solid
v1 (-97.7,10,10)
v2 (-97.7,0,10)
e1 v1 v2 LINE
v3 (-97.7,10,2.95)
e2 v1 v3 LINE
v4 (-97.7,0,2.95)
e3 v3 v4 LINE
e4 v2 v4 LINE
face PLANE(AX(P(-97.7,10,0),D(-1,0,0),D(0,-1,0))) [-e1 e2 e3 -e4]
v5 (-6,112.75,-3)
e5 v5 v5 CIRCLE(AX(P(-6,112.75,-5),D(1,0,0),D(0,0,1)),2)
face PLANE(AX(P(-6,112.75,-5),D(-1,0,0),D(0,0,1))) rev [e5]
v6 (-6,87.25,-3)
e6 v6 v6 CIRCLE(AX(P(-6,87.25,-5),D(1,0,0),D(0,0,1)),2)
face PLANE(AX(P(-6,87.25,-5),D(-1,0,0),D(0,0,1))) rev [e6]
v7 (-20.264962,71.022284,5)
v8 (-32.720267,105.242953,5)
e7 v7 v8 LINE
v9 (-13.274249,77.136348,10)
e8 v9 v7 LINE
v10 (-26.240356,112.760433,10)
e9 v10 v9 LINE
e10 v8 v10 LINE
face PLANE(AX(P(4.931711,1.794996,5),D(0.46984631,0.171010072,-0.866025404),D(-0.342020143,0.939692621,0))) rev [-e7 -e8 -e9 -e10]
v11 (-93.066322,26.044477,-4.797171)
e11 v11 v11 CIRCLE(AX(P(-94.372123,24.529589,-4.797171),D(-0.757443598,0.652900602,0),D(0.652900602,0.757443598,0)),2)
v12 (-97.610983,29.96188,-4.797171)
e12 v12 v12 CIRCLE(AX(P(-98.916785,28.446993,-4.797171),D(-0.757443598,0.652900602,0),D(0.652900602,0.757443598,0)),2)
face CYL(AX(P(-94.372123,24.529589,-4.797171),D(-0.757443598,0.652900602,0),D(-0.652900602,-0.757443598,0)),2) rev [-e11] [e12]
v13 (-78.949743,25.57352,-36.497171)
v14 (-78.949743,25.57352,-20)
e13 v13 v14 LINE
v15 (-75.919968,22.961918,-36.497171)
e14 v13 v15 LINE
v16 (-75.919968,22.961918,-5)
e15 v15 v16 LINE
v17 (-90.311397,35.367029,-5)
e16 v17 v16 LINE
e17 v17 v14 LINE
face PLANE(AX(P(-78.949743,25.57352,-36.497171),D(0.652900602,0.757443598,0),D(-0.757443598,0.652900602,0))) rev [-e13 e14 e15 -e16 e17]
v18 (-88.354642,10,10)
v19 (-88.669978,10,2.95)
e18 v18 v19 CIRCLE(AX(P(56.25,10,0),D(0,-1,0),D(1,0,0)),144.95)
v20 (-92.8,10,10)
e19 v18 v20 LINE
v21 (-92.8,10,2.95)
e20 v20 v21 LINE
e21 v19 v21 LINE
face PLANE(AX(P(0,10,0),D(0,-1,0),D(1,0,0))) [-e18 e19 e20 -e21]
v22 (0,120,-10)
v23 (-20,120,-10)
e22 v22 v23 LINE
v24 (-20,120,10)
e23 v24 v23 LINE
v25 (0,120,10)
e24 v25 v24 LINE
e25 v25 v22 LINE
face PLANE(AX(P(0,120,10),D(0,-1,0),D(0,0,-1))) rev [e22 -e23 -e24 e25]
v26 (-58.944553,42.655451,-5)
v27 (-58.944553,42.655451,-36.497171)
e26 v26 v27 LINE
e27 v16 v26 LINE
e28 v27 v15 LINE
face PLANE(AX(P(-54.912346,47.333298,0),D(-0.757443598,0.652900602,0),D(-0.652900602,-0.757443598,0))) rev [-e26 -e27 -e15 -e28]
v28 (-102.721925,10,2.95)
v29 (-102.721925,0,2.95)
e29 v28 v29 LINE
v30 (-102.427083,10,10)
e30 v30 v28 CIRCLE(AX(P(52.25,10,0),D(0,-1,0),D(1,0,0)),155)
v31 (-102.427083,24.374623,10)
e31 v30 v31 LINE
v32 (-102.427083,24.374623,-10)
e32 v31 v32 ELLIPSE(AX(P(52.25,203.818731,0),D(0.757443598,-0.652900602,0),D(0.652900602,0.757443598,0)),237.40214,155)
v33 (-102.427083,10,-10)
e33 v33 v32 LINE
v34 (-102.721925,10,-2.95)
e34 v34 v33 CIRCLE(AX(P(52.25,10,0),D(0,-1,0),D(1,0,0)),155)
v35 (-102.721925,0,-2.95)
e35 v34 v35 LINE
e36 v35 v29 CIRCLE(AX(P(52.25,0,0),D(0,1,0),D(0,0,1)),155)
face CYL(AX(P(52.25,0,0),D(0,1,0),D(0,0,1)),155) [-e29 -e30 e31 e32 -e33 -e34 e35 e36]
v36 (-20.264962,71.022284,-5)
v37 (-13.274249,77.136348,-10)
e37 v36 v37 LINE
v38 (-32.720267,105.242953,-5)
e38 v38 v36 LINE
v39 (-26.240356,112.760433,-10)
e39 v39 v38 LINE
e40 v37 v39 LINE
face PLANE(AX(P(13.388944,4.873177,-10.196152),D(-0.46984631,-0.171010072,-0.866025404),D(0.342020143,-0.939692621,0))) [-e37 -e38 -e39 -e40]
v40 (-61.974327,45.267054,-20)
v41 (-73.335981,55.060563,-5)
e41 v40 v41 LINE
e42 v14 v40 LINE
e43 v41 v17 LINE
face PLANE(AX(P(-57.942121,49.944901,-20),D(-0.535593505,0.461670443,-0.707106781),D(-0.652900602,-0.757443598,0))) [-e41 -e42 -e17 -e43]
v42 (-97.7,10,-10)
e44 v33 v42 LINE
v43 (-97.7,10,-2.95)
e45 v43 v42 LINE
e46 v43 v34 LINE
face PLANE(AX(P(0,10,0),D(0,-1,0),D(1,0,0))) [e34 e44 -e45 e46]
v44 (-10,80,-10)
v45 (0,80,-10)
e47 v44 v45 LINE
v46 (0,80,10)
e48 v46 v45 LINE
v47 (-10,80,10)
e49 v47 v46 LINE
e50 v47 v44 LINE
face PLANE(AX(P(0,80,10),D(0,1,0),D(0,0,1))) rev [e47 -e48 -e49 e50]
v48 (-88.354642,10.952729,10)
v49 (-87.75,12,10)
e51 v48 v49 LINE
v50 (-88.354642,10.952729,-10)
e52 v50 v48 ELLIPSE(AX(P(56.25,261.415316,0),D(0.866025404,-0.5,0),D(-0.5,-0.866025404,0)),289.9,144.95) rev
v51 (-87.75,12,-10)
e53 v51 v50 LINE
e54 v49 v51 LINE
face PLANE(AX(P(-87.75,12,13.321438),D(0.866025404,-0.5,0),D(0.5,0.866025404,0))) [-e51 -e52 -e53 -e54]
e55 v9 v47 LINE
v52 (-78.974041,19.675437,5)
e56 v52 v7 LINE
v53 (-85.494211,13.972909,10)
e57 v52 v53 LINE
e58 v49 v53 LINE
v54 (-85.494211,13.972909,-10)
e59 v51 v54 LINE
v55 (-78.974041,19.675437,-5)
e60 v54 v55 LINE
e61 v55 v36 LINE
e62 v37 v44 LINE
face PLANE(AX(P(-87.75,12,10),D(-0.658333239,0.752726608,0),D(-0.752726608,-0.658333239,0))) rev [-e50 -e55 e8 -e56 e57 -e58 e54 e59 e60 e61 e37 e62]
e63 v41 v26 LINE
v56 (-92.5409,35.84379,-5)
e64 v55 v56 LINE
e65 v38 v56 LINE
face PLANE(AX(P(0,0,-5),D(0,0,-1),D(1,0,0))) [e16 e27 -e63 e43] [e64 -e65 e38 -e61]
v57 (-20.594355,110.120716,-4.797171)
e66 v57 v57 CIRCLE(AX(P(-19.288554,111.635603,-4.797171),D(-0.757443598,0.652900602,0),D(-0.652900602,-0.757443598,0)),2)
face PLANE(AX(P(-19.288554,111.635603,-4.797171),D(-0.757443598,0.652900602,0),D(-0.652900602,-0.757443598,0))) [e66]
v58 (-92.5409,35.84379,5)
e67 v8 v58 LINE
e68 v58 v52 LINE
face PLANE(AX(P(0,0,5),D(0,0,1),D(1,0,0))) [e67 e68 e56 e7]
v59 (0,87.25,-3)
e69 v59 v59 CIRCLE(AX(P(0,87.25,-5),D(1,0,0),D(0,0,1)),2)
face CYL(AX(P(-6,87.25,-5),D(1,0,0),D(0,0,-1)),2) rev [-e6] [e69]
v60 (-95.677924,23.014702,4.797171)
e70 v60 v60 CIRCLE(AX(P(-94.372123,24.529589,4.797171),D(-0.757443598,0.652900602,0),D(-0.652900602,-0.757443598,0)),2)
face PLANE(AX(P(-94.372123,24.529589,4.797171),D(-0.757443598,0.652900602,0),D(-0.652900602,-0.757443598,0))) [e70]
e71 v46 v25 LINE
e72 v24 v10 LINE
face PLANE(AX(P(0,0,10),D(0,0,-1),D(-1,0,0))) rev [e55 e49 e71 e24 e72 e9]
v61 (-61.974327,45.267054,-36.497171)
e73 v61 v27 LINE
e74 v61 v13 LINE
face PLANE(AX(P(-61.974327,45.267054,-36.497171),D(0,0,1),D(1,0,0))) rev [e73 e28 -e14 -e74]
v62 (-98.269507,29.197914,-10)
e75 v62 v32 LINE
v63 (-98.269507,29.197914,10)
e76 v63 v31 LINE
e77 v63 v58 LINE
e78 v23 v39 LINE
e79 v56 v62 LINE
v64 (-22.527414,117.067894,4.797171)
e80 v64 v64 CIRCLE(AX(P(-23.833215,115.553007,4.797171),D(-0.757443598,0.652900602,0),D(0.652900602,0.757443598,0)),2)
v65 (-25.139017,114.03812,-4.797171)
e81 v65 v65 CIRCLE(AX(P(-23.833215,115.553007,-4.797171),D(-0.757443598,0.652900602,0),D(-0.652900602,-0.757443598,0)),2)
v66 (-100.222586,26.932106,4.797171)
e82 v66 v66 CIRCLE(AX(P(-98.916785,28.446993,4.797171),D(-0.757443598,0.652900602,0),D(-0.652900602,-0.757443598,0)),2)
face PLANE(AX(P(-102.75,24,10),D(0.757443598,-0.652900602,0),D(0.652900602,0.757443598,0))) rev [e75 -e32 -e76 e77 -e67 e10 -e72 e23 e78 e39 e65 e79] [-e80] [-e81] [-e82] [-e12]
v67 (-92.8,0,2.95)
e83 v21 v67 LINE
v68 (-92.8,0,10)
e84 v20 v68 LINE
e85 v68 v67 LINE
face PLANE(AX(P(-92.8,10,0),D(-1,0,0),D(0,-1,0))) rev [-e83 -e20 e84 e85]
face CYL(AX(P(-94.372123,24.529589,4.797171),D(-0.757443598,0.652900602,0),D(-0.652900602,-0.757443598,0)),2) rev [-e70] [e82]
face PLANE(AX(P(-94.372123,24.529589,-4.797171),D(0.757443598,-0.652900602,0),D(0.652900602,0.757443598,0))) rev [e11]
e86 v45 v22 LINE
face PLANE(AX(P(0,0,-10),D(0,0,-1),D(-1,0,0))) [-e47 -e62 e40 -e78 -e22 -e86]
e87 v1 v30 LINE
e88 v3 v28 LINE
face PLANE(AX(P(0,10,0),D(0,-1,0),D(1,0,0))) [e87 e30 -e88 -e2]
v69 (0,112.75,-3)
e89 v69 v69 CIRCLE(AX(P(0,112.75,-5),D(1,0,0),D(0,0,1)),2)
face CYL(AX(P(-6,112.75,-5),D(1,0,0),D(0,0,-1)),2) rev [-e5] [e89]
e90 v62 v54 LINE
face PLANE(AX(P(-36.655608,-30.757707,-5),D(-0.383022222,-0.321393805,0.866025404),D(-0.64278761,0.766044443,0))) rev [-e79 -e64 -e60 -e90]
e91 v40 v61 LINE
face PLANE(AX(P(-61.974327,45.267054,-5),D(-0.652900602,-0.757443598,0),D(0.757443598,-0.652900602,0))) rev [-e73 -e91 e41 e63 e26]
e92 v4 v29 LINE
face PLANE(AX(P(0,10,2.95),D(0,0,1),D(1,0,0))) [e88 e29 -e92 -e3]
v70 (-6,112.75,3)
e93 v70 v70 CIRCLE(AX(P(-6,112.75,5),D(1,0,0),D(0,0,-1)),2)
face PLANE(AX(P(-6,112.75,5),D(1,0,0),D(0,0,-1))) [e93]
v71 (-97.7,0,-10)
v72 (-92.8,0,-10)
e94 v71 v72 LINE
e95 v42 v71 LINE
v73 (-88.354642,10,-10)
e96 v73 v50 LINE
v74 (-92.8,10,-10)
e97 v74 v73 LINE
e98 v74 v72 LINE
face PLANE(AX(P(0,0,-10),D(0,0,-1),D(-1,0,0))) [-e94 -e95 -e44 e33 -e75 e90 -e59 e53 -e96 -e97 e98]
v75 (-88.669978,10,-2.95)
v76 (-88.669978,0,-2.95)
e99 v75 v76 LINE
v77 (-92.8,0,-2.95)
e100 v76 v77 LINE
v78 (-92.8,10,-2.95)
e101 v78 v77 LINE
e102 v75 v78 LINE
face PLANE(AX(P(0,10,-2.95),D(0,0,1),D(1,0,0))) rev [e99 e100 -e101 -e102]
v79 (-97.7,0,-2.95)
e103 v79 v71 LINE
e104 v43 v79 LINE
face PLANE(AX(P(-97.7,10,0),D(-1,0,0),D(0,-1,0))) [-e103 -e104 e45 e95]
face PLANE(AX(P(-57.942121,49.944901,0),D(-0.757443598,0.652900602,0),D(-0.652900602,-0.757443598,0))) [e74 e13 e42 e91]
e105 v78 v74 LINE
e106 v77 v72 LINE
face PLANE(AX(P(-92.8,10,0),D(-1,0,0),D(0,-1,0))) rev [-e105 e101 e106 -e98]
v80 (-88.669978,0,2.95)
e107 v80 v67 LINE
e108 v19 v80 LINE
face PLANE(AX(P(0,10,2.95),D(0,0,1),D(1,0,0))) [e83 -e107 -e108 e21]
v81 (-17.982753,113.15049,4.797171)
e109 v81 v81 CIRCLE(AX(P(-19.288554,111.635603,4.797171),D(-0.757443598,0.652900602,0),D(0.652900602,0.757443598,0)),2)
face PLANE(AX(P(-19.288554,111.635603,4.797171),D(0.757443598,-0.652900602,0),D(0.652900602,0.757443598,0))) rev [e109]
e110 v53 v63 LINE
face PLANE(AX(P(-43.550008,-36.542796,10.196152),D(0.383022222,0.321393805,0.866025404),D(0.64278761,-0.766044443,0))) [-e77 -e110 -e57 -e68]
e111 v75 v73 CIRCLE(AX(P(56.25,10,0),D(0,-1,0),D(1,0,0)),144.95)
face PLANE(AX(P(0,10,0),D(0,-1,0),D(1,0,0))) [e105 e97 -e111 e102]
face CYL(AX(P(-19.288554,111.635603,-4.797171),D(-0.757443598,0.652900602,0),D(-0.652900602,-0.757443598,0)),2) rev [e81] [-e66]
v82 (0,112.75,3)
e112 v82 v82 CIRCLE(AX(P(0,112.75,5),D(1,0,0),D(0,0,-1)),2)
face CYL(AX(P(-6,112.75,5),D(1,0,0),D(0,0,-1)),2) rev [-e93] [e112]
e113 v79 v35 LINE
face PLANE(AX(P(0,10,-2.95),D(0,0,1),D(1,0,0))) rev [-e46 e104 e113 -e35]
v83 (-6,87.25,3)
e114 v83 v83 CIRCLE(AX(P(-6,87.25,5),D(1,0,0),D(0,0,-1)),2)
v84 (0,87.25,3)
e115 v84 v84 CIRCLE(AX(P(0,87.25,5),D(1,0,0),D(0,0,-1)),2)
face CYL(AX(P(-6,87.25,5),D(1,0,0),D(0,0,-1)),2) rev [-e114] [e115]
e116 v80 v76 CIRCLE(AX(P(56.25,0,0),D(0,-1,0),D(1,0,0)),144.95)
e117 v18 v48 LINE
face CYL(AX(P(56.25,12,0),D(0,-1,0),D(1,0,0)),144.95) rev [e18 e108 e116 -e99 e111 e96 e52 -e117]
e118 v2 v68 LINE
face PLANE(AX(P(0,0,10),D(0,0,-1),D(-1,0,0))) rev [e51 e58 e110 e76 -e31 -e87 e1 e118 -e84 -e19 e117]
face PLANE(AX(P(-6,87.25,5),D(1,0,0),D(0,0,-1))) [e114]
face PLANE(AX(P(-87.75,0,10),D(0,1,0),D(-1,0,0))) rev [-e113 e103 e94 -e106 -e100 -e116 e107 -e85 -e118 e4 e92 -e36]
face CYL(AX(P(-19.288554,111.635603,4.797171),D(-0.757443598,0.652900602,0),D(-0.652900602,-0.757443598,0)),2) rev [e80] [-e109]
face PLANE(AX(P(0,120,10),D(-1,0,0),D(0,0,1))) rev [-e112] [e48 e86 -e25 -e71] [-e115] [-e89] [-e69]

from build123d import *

# Parameters (mm, degrees)
BOSS_EXTRUDE1_DEPTH        = 10
SKETCH2_W                  = 5.05
SKETCH2_H                  = 7.05
CUT_EXTRUDE6_DEPTH         = 10
CUT_EXTRUDE7_DEPTH         = 5
CHAMFER2_SIZE              = 5.196152423
CHAMFER2_SIZE_2            = 9
CHAMFER2_OF_MIRROR4_SIZE   = 5.196152423
CHAMFER2_OF_MIRROR4_SIZE_2 = 9
SKETCH5_R                  = 2
CUT_EXTRUDE5_DEPTH         = 6
CUT_EXTRUDE8_START         = -120
CUT_EXTRUDE8_DEPTH         = 24.374622763
SKETCH8_R                  = 144.95
CUT_EXTRUDE9_DEPTH         = 12
BOSS_EXTRUDE2_DEPTH        = 20
SKETCH12_R                 = 2
CUT_EXTRUDE10_DEPTH        = 6
BOSS_EXTRUDE3_START        = -21
SKETCH13_W                 = 31.497171345
SKETCH13_H                 = 26
BOSS_EXTRUDE3_DEPTH        = 4
CHAMFER3_SIZE              = 15


# Read off the part's stored shape, not the designer's step: Cut-Extrude8
with BuildPart() as part:
    # Sketch1 → Boss-Extrude1 (new, symmetric)
    with BuildSketch(Plane.XY):
        Polygon((0, 120), (0, 80), (-10, 80), (-87.75, 12), (-87.75, 0), (-102.75, 0), (-102.75, 24), (-20, 120), align=None)
    extrude(amount=BOSS_EXTRUDE1_DEPTH, both=True)

    # Sketch2 → Cut-Extrude6 (cut)
    with BuildSketch(Plane.XZ):
        with Locations((-100.225, 6.475)):
            Rectangle(SKETCH2_W, SKETCH2_H)
        with Locations((-90.275, 6.475)):
            Rectangle(SKETCH2_W, SKETCH2_H)
        with Locations((-90.275, -6.475)):
            Rectangle(SKETCH2_W, SKETCH2_H)
        with Locations((-100.225, -6.475)):
            Rectangle(SKETCH2_W, SKETCH2_H)
    extrude(amount=-CUT_EXTRUDE6_DEPTH, mode=Mode.SUBTRACT)

    # Sketch6 → Cut-Extrude7 (cut)
    with BuildSketch(Plane.XY.offset(10)):
        Polygon((-98.494242528, 28.937192959), (-85.75, 13.749196141), (-13, 77.376205788), (-25.986145629, 113.055347669), align=None)
    cut_extrude7 = extrude(amount=-CUT_EXTRUDE7_DEPTH, mode=Mode.SUBTRACT)

    # Chamfer2
    # the kernel refuses this chamfer: 9, 5.196152423 mm, written as the material it adds along each edge
    with BuildSketch(Plane(origin=(-5.036481035, 55.496617251, 5), x_dir=(0.05440243528858507, 0.019800867116638043, 0.9983227437537925), z_dir=(-0.342020143325666, 0.9396926207859094, 0))) as chamfer2_piece_1_section:
        Polygon((CHAMFER2_SIZE * 0.998322743697, -CHAMFER2_SIZE * 0.0578938623994), (-CHAMFER2_SIZE_2 * 0.0578938624027, -CHAMFER2_SIZE_2 * 0.998322743754), (0, 0), align=None)
    chamfer2_piece_1 = extrude(amount=84.536493315, mode=Mode.PRIVATE)
    chamfer2_piece_1 = split(chamfer2_piece_1, bisect_by=Plane(origin=(-21.83844233, 92.842389445, 10), z_dir=(0, 0, -1)), keep=Keep.TOP, mode=Mode.PRIVATE)
    chamfer2_piece_1 = split(chamfer2_piece_1, bisect_by=Plane(origin=(-34.214088998, 103.509939047, 6.650101228), z_dir=(0.7574435982041207, -0.6529006015769894, 0)), keep=Keep.TOP, mode=Mode.PRIVATE)
    chamfer2_piece_1 = split(chamfer2_piece_1, bisect_by=Plane(origin=(-10.343648825, 79.699445401, 6.650101228), z_dir=(-0.6583332390976693, 0.7527266079388791, 0)), keep=Keep.TOP, mode=Mode.PRIVATE)
    add(chamfer2_piece_1)
    with BuildSketch(Plane(origin=(-113.460762542, 46.773596955, 5), x_dir=(-0.04434927158426045, -0.03721345742933334, 0.9983227437537927), z_dir=(0.642787609686533, -0.7660444431189835, 0))) as chamfer2_piece_2_section:
        Polygon((CHAMFER2_SIZE * 0.998322743697, -CHAMFER2_SIZE * 0.0578938623994), (-CHAMFER2_SIZE_2 * 0.0578938624027, -CHAMFER2_SIZE_2 * 0.998322743754), (0, 0), align=None)
    chamfer2_piece_2 = extrude(amount=66.394065339, mode=Mode.PRIVATE)
    chamfer2_piece_2 = split(chamfer2_piece_2, bisect_by=Plane(origin=(-97.520772346, 30.066536009, 6.631431033), z_dir=(0.7574435982041207, -0.6529006015769894, 0)), keep=Keep.TOP, mode=Mode.PRIVATE)
    chamfer2_piece_2 = split(chamfer2_piece_2, bisect_by=Plane(origin=(-83.277010041, 15.912068389, 6.631431033), z_dir=(-0.6583332390976693, 0.7527266079388791, 0)), keep=Keep.TOP, mode=Mode.PRIVATE)
    chamfer2_piece_2 = split(chamfer2_piece_2, bisect_by=Plane(origin=(-89.945880011, 23.537136627, 10), z_dir=(0, 0, -1)), keep=Keep.TOP, mode=Mode.PRIVATE)
    add(chamfer2_piece_2)

    # Mirror4: Cut-Extrude7 across plane
    add(cut_extrude7.mirror(Plane.XY), mode=Mode.SUBTRACT)

    # Chamfer2 of Mirror4
    # the kernel refuses this chamfer: 9, 5.196152423 mm, written as the material it adds along each edge
    with BuildSketch(Plane(origin=(-5.036481035, 55.496617251, -5), x_dir=(0.05440243528858507, 0.019800867116638043, -0.9983227437537925), z_dir=(-0.342020143325666, 0.9396926207859094, 0))) as chamfer2_of_mirror4_piece_1_section:
        Polygon((CHAMFER2_OF_MIRROR4_SIZE * 0.998322743697, CHAMFER2_OF_MIRROR4_SIZE * 0.0578938623994), (-CHAMFER2_OF_MIRROR4_SIZE_2 * 0.0578938624027, CHAMFER2_OF_MIRROR4_SIZE_2 * 0.998322743754), (0, 0), align=None)
    chamfer2_of_mirror4_piece_1 = extrude(amount=84.536493315, mode=Mode.PRIVATE)
    chamfer2_of_mirror4_piece_1 = split(chamfer2_of_mirror4_piece_1, bisect_by=Plane(origin=(-34.214088998, 103.509939047, -6.650101228), z_dir=(0.7574435982040639, -0.6529006015770552, 0)), keep=Keep.TOP, mode=Mode.PRIVATE)
    chamfer2_of_mirror4_piece_1 = split(chamfer2_of_mirror4_piece_1, bisect_by=Plane(origin=(-10.343648825, 79.699445401, -6.650101228), z_dir=(-0.6583332390977968, 0.7527266079387677, 0)), keep=Keep.TOP, mode=Mode.PRIVATE)
    chamfer2_of_mirror4_piece_1 = split(chamfer2_of_mirror4_piece_1, bisect_by=Plane(origin=(-21.83844233, 92.842389445, -10), z_dir=(0, 0, 1)), keep=Keep.TOP, mode=Mode.PRIVATE)
    add(chamfer2_of_mirror4_piece_1)
    with BuildSketch(Plane(origin=(-113.460762542, 46.773596955, -5), x_dir=(0.7659013618145366, 0.6426675502167433, 0.019326765612700778), z_dir=(0.642787609686533, -0.7660444431189835, 0))) as chamfer2_of_mirror4_piece_2_section:
        Polygon((CHAMFER2_OF_MIRROR4_SIZE_2 * 0.999813220622, -CHAMFER2_OF_MIRROR4_SIZE_2 * 0.0193267656127), (-CHAMFER2_OF_MIRROR4_SIZE * 0.0193267656116, -CHAMFER2_OF_MIRROR4_SIZE * 0.999813220566), (0, 0), align=None)
    chamfer2_of_mirror4_piece_2 = extrude(amount=66.394065339, mode=Mode.PRIVATE)
    chamfer2_of_mirror4_piece_2 = split(chamfer2_of_mirror4_piece_2, bisect_by=Plane(origin=(-97.520772346, 30.066536009, -6.631431033), z_dir=(0.7574435982040639, -0.6529006015770552, 0)), keep=Keep.TOP, mode=Mode.PRIVATE)
    chamfer2_of_mirror4_piece_2 = split(chamfer2_of_mirror4_piece_2, bisect_by=Plane(origin=(-83.277010041, 15.912068389, -6.631431033), z_dir=(-0.6583332390977968, 0.7527266079387677, 0)), keep=Keep.TOP, mode=Mode.PRIVATE)
    chamfer2_of_mirror4_piece_2 = split(chamfer2_of_mirror4_piece_2, bisect_by=Plane(origin=(-89.945880011, 23.537136627, -10), z_dir=(0, 0, 1)), keep=Keep.TOP, mode=Mode.PRIVATE)
    add(chamfer2_of_mirror4_piece_2)

    # Sketch5 → Cut-Extrude5 (cut)
    with BuildSketch(Plane(origin=(0, 0, 0), x_dir=(0, 0, -1), z_dir=(1, 0, 0))):
        with Locations((-5, 112.75)):
            Circle(SKETCH5_R)
        with Locations((-5, 87.25)):
            Circle(SKETCH5_R)
        with Locations(Location((5, 87.25, 0), (0, 0, 180))):
            Circle(SKETCH5_R)
        with Locations(Location((5, 112.75, 0), (0, 0, 180))):
            Circle(SKETCH5_R)
    extrude(amount=-CUT_EXTRUDE5_DEPTH, mode=Mode.SUBTRACT)

    # Cut-Extrude8 outline → Cut-Extrude8 (cut)
    with BuildSketch(Plane(origin=(0, 120, 0), x_dir=(1, 0, 0), z_dir=(0, 1, 0)).offset(CUT_EXTRUDE8_START)):
        with BuildLine():
            Line((-102.75, 7.56e-07), (-102.75, -10))
            Line((-102.75, -10), (-102.427082983, -10))
            ThreePointArc((-102.427082983, -10), (-102.669249724, -5.002605828), (-102.75, 7.56e-07))
        make_face()
        with BuildLine():
            Line((-102.427082983, 10), (-102.75, 10))
            Line((-102.75, 10), (-102.75, 7.56e-07))
            ThreePointArc((-102.75, 7.56e-07), (-102.669249699, 5.002606583), (-102.427082983, 10))
        make_face()
    extrude(amount=CUT_EXTRUDE8_DEPTH, mode=Mode.SUBTRACT)

    # Sketch8 → Cut-Extrude9 (cut)
    with BuildSketch(Plane.XZ):
        with Locations((56.25, 0)):
            Circle(SKETCH8_R)
    extrude(amount=-CUT_EXTRUDE9_DEPTH, mode=Mode.SUBTRACT)

    # Sketch10 → Boss-Extrude2 (add)
    with BuildSketch(Plane(origin=(0, 0, -10), x_dir=(-1, 0, 0), z_dir=(0, 0, -1))):
        Polygon((87.75, 12), (88.771540348, 10.230640215), (90.560927794, 10.230640215), (90.560927794, 12), align=None)
    extrude(amount=-BOSS_EXTRUDE2_DEPTH)

    # Sketch12 → Cut-Extrude10 (cut)
    with BuildSketch(Plane(origin=(-70.818661801, 61.044211083, 0), x_dir=(0, 0, 1), z_dir=(-0.7574435982041208, 0.6529006015769894, 0))):
        with Locations(Location((-4.797171345, 71.964164649, 0), (0, 0, 270))):
            Circle(SKETCH12_R)
        with Locations(Location((4.797171345, 71.964164649, 0), (0, 0, 90))):
            Circle(SKETCH12_R)
        with Locations(Location((4.797171345, -43.035835351, 0), (0, 0, 270))):
            Circle(SKETCH12_R)
        with Locations(Location((-4.797171345, -43.035835351, 0), (0, 0, 90))):
            Circle(SKETCH12_R)
    extrude(amount=-CUT_EXTRUDE10_DEPTH, mode=Mode.SUBTRACT)

    # Sketch13 → Boss-Extrude3 (add)
    with BuildSketch(Plane(origin=(-70.818661801, 61.044211083, 0), x_dir=(0, 0, 1), z_dir=(-0.7574435982041208, 0.6529006015769894, 0)).offset(BOSS_EXTRUDE3_START)):
        with Locations((-20.748585673, -19.175835351)):
            Rectangle(SKETCH13_W, SKETCH13_H)
    extrude(amount=BOSS_EXTRUDE3_DEPTH)

    # Chamfer3
    chamfer3_edges = [part.edges().sort_by_distance(p)[0] for p in [
        (-70.462035068, 35.42028713, -5),
    ]]
    chamfer(chamfer3_edges, length=CHAMFER3_SIZE)


solid = part.part
